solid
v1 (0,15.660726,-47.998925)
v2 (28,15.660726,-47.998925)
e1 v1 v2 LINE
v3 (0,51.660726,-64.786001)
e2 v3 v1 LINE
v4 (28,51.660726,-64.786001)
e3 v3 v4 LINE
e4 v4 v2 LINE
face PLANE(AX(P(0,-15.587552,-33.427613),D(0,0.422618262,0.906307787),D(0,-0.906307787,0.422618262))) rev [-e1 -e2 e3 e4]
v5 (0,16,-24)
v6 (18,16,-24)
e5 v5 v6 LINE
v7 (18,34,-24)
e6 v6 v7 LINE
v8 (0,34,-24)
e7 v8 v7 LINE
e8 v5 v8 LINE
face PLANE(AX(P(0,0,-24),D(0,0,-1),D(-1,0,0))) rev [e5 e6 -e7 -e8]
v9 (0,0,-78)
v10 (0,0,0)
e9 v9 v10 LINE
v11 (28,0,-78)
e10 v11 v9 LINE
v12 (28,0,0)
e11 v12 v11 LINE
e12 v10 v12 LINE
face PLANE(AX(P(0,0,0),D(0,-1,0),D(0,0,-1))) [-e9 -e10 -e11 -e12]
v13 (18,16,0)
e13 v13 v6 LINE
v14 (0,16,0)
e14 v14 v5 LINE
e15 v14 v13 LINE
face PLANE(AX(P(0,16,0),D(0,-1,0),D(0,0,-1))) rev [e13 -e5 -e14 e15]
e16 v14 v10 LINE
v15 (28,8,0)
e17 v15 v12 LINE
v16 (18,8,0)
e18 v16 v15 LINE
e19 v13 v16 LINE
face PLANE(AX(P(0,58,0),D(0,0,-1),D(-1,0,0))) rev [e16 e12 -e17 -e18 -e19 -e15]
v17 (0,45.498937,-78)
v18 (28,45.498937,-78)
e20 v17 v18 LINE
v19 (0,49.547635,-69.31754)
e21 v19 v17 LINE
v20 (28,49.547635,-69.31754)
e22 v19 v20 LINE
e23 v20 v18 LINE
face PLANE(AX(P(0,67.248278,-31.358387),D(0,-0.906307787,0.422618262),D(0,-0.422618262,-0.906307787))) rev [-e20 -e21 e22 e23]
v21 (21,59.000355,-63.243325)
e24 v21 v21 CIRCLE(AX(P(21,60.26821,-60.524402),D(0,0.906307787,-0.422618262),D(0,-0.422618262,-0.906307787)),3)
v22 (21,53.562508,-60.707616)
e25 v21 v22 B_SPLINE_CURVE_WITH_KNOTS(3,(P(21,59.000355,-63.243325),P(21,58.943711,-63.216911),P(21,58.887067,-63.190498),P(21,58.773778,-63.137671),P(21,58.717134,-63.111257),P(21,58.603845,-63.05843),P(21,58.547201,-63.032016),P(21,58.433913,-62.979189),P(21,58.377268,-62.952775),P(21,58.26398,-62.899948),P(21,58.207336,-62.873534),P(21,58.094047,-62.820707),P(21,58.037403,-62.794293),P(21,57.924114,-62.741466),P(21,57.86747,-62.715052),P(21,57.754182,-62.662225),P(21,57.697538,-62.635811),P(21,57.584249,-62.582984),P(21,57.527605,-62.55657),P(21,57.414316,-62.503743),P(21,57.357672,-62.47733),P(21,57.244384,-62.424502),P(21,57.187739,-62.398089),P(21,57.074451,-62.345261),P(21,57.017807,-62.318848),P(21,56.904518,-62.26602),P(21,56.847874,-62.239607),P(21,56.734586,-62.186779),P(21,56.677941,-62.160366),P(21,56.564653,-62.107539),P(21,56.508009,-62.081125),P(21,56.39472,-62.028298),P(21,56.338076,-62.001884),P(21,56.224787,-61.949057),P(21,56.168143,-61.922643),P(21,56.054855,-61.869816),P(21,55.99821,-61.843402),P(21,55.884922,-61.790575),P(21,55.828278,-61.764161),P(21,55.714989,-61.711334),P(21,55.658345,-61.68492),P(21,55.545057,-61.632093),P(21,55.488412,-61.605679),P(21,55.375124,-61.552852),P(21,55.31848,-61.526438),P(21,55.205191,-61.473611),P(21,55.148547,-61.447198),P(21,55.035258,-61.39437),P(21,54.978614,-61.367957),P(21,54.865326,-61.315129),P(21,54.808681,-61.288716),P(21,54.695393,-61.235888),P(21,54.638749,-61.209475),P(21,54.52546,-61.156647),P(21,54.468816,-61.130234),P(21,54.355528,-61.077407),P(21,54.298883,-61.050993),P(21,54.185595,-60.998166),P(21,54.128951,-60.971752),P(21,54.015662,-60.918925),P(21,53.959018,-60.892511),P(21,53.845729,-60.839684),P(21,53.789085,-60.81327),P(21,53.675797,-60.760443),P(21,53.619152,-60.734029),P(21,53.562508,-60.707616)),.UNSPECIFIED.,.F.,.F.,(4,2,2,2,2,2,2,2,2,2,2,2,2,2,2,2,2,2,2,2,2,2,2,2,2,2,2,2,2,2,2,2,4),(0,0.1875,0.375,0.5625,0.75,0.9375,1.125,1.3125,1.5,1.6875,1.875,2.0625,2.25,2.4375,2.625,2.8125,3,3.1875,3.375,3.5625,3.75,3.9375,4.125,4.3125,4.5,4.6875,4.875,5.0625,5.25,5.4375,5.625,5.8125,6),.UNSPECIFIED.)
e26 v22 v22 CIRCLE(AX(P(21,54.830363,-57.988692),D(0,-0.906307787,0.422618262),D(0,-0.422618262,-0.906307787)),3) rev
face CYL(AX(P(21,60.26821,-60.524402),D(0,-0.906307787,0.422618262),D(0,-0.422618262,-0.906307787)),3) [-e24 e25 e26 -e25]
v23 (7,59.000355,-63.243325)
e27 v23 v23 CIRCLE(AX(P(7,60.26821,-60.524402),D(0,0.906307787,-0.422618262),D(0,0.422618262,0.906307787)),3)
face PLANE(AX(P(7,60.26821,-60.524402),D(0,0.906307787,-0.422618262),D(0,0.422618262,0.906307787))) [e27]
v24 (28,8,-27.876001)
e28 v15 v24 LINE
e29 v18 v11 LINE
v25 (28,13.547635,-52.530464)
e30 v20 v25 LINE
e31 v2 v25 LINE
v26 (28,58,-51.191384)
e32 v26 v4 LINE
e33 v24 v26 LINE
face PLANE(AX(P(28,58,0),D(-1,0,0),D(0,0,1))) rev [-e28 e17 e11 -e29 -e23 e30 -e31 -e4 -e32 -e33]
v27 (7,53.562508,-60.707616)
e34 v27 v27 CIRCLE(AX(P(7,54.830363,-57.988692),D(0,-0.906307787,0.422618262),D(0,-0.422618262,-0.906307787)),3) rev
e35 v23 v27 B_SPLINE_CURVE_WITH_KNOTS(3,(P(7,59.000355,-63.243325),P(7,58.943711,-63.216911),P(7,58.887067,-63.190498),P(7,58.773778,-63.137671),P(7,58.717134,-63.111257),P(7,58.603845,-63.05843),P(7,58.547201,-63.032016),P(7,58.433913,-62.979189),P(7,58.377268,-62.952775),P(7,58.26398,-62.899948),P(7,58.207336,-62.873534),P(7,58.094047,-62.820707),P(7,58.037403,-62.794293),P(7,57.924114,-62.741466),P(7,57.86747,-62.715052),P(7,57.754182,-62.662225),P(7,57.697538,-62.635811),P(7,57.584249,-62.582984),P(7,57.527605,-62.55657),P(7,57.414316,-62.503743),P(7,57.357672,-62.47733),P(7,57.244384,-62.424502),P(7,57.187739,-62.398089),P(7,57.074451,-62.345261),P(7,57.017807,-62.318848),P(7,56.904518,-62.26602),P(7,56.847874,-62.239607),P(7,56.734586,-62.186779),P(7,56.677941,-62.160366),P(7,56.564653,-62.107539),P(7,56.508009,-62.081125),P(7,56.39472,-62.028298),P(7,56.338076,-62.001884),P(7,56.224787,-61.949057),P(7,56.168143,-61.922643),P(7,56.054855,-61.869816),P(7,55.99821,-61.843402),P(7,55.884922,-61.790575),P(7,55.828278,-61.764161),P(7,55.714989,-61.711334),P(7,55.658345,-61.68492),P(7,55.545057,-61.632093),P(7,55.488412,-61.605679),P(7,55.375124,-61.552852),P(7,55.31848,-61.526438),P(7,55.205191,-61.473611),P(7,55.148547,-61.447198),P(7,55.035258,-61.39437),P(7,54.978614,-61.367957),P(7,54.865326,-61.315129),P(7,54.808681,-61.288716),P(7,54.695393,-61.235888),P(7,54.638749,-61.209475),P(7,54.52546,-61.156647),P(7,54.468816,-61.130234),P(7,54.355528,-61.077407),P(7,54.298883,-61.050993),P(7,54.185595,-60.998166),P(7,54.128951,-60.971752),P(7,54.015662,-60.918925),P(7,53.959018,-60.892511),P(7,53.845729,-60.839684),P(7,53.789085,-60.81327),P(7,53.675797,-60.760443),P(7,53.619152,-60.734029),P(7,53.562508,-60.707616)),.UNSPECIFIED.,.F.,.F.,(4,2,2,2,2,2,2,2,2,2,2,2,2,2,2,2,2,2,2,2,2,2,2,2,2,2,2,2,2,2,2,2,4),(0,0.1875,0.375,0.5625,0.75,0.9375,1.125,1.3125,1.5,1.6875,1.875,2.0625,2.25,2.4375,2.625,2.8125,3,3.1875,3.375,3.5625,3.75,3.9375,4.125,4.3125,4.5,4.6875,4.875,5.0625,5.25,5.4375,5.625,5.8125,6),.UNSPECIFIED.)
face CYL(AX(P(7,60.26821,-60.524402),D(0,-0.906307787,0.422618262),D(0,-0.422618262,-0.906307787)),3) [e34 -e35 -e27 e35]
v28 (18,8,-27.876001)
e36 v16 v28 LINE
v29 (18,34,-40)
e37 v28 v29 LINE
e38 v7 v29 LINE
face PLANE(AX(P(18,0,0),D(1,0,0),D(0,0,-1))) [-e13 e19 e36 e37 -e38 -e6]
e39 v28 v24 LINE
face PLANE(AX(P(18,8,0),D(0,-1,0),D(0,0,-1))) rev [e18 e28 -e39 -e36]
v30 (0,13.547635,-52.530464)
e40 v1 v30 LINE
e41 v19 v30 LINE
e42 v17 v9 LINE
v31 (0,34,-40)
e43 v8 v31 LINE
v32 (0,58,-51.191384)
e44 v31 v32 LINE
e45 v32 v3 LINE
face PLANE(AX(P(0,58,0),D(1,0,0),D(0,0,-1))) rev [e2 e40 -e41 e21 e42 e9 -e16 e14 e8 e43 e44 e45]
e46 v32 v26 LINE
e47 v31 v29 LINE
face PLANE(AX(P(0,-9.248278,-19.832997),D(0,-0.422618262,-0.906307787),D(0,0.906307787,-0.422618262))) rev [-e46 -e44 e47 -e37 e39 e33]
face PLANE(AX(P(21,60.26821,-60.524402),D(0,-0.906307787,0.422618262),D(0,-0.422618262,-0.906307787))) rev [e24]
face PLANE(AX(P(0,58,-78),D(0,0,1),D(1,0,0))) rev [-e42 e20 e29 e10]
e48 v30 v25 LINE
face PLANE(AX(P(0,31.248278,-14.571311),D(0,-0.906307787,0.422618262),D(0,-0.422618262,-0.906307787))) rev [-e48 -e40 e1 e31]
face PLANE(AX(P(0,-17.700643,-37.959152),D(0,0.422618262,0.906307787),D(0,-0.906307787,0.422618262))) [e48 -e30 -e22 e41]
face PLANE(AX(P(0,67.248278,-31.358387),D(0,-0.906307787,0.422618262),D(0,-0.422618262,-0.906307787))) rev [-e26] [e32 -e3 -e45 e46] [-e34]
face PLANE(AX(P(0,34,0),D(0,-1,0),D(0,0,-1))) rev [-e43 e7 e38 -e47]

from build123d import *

# Parameters (mm, degrees)
SKETCH1_W           = 28
SKETCH1_H           = 78
BOSS_EXTRUDE1_DEPTH = 58
SKETCH2_OUTSIDE_W   = 100.23
SKETCH2_OUTSIDE_H   = 80.23
CUT_EXTRUDE1_DEPTH  = 102.153348931
CUT_EXTRUDE2_DEPTH  = 10
SKETCH3_R           = 3
BOSS_EXTRUDE2_DEPTH = 6


with BuildPart() as part:
    # Sketch1 → Boss-Extrude1 (new body)
    with BuildSketch(Plane(origin=(0, 0, 0), x_dir=(1, 0, 0), z_dir=(0, 1, 0))):
        with Locations((14, 39)):
            Rectangle(SKETCH1_W, SKETCH1_H)
    extrude(amount=BOSS_EXTRUDE1_DEPTH)

    # Sketch2 outside → Cut-Extrude1 (cut, through all)
    with BuildSketch(Plane(origin=(28, 0, 0), x_dir=(0, 0, -1), z_dir=(1, 0, 0))):
        with Locations((39, 29)):
            Rectangle(SKETCH2_OUTSIDE_W, SKETCH2_OUTSIDE_H)
        Polygon((0, 0), (78, 0), (78, 45.498936959), (69.317539536, 49.547634765), (52.530463843, 13.547634765), (47.998924908, 15.660726074), (64.786000601, 51.660726074), (51.191383796, 58), (40, 34), (24, 34), (24, 16), (0, 16), align=None, mode=Mode.SUBTRACT)
    extrude(amount=-CUT_EXTRUDE1_DEPTH, mode=Mode.SUBTRACT)

    # Sketch2<3> → Cut-Extrude2 (cut)
    with BuildSketch(Plane(origin=(28, 0, 0), x_dir=(0, 0, -1), z_dir=(1, 0, 0))):
        Polygon((0, 16), (0, 8), (27.876000888, 8), (40, 34), (24, 34), (24, 16), align=None)
    extrude(amount=-CUT_EXTRUDE2_DEPTH, mode=Mode.SUBTRACT)

    # Sketch3 → Boss-Extrude2 (add)
    with BuildSketch(Plane(origin=(0, 67.248278227, -31.358387135), x_dir=(1, 0, 0), z_dir=(0, 0.906307787036651, -0.4226182617406971))):
        with Locations((7, 29.383290582)):
            Circle(SKETCH3_R)
        with Locations((21, 29.383290582)):
            Circle(SKETCH3_R)
    extrude(amount=BOSS_EXTRUDE2_DEPTH)


solid = part.part
